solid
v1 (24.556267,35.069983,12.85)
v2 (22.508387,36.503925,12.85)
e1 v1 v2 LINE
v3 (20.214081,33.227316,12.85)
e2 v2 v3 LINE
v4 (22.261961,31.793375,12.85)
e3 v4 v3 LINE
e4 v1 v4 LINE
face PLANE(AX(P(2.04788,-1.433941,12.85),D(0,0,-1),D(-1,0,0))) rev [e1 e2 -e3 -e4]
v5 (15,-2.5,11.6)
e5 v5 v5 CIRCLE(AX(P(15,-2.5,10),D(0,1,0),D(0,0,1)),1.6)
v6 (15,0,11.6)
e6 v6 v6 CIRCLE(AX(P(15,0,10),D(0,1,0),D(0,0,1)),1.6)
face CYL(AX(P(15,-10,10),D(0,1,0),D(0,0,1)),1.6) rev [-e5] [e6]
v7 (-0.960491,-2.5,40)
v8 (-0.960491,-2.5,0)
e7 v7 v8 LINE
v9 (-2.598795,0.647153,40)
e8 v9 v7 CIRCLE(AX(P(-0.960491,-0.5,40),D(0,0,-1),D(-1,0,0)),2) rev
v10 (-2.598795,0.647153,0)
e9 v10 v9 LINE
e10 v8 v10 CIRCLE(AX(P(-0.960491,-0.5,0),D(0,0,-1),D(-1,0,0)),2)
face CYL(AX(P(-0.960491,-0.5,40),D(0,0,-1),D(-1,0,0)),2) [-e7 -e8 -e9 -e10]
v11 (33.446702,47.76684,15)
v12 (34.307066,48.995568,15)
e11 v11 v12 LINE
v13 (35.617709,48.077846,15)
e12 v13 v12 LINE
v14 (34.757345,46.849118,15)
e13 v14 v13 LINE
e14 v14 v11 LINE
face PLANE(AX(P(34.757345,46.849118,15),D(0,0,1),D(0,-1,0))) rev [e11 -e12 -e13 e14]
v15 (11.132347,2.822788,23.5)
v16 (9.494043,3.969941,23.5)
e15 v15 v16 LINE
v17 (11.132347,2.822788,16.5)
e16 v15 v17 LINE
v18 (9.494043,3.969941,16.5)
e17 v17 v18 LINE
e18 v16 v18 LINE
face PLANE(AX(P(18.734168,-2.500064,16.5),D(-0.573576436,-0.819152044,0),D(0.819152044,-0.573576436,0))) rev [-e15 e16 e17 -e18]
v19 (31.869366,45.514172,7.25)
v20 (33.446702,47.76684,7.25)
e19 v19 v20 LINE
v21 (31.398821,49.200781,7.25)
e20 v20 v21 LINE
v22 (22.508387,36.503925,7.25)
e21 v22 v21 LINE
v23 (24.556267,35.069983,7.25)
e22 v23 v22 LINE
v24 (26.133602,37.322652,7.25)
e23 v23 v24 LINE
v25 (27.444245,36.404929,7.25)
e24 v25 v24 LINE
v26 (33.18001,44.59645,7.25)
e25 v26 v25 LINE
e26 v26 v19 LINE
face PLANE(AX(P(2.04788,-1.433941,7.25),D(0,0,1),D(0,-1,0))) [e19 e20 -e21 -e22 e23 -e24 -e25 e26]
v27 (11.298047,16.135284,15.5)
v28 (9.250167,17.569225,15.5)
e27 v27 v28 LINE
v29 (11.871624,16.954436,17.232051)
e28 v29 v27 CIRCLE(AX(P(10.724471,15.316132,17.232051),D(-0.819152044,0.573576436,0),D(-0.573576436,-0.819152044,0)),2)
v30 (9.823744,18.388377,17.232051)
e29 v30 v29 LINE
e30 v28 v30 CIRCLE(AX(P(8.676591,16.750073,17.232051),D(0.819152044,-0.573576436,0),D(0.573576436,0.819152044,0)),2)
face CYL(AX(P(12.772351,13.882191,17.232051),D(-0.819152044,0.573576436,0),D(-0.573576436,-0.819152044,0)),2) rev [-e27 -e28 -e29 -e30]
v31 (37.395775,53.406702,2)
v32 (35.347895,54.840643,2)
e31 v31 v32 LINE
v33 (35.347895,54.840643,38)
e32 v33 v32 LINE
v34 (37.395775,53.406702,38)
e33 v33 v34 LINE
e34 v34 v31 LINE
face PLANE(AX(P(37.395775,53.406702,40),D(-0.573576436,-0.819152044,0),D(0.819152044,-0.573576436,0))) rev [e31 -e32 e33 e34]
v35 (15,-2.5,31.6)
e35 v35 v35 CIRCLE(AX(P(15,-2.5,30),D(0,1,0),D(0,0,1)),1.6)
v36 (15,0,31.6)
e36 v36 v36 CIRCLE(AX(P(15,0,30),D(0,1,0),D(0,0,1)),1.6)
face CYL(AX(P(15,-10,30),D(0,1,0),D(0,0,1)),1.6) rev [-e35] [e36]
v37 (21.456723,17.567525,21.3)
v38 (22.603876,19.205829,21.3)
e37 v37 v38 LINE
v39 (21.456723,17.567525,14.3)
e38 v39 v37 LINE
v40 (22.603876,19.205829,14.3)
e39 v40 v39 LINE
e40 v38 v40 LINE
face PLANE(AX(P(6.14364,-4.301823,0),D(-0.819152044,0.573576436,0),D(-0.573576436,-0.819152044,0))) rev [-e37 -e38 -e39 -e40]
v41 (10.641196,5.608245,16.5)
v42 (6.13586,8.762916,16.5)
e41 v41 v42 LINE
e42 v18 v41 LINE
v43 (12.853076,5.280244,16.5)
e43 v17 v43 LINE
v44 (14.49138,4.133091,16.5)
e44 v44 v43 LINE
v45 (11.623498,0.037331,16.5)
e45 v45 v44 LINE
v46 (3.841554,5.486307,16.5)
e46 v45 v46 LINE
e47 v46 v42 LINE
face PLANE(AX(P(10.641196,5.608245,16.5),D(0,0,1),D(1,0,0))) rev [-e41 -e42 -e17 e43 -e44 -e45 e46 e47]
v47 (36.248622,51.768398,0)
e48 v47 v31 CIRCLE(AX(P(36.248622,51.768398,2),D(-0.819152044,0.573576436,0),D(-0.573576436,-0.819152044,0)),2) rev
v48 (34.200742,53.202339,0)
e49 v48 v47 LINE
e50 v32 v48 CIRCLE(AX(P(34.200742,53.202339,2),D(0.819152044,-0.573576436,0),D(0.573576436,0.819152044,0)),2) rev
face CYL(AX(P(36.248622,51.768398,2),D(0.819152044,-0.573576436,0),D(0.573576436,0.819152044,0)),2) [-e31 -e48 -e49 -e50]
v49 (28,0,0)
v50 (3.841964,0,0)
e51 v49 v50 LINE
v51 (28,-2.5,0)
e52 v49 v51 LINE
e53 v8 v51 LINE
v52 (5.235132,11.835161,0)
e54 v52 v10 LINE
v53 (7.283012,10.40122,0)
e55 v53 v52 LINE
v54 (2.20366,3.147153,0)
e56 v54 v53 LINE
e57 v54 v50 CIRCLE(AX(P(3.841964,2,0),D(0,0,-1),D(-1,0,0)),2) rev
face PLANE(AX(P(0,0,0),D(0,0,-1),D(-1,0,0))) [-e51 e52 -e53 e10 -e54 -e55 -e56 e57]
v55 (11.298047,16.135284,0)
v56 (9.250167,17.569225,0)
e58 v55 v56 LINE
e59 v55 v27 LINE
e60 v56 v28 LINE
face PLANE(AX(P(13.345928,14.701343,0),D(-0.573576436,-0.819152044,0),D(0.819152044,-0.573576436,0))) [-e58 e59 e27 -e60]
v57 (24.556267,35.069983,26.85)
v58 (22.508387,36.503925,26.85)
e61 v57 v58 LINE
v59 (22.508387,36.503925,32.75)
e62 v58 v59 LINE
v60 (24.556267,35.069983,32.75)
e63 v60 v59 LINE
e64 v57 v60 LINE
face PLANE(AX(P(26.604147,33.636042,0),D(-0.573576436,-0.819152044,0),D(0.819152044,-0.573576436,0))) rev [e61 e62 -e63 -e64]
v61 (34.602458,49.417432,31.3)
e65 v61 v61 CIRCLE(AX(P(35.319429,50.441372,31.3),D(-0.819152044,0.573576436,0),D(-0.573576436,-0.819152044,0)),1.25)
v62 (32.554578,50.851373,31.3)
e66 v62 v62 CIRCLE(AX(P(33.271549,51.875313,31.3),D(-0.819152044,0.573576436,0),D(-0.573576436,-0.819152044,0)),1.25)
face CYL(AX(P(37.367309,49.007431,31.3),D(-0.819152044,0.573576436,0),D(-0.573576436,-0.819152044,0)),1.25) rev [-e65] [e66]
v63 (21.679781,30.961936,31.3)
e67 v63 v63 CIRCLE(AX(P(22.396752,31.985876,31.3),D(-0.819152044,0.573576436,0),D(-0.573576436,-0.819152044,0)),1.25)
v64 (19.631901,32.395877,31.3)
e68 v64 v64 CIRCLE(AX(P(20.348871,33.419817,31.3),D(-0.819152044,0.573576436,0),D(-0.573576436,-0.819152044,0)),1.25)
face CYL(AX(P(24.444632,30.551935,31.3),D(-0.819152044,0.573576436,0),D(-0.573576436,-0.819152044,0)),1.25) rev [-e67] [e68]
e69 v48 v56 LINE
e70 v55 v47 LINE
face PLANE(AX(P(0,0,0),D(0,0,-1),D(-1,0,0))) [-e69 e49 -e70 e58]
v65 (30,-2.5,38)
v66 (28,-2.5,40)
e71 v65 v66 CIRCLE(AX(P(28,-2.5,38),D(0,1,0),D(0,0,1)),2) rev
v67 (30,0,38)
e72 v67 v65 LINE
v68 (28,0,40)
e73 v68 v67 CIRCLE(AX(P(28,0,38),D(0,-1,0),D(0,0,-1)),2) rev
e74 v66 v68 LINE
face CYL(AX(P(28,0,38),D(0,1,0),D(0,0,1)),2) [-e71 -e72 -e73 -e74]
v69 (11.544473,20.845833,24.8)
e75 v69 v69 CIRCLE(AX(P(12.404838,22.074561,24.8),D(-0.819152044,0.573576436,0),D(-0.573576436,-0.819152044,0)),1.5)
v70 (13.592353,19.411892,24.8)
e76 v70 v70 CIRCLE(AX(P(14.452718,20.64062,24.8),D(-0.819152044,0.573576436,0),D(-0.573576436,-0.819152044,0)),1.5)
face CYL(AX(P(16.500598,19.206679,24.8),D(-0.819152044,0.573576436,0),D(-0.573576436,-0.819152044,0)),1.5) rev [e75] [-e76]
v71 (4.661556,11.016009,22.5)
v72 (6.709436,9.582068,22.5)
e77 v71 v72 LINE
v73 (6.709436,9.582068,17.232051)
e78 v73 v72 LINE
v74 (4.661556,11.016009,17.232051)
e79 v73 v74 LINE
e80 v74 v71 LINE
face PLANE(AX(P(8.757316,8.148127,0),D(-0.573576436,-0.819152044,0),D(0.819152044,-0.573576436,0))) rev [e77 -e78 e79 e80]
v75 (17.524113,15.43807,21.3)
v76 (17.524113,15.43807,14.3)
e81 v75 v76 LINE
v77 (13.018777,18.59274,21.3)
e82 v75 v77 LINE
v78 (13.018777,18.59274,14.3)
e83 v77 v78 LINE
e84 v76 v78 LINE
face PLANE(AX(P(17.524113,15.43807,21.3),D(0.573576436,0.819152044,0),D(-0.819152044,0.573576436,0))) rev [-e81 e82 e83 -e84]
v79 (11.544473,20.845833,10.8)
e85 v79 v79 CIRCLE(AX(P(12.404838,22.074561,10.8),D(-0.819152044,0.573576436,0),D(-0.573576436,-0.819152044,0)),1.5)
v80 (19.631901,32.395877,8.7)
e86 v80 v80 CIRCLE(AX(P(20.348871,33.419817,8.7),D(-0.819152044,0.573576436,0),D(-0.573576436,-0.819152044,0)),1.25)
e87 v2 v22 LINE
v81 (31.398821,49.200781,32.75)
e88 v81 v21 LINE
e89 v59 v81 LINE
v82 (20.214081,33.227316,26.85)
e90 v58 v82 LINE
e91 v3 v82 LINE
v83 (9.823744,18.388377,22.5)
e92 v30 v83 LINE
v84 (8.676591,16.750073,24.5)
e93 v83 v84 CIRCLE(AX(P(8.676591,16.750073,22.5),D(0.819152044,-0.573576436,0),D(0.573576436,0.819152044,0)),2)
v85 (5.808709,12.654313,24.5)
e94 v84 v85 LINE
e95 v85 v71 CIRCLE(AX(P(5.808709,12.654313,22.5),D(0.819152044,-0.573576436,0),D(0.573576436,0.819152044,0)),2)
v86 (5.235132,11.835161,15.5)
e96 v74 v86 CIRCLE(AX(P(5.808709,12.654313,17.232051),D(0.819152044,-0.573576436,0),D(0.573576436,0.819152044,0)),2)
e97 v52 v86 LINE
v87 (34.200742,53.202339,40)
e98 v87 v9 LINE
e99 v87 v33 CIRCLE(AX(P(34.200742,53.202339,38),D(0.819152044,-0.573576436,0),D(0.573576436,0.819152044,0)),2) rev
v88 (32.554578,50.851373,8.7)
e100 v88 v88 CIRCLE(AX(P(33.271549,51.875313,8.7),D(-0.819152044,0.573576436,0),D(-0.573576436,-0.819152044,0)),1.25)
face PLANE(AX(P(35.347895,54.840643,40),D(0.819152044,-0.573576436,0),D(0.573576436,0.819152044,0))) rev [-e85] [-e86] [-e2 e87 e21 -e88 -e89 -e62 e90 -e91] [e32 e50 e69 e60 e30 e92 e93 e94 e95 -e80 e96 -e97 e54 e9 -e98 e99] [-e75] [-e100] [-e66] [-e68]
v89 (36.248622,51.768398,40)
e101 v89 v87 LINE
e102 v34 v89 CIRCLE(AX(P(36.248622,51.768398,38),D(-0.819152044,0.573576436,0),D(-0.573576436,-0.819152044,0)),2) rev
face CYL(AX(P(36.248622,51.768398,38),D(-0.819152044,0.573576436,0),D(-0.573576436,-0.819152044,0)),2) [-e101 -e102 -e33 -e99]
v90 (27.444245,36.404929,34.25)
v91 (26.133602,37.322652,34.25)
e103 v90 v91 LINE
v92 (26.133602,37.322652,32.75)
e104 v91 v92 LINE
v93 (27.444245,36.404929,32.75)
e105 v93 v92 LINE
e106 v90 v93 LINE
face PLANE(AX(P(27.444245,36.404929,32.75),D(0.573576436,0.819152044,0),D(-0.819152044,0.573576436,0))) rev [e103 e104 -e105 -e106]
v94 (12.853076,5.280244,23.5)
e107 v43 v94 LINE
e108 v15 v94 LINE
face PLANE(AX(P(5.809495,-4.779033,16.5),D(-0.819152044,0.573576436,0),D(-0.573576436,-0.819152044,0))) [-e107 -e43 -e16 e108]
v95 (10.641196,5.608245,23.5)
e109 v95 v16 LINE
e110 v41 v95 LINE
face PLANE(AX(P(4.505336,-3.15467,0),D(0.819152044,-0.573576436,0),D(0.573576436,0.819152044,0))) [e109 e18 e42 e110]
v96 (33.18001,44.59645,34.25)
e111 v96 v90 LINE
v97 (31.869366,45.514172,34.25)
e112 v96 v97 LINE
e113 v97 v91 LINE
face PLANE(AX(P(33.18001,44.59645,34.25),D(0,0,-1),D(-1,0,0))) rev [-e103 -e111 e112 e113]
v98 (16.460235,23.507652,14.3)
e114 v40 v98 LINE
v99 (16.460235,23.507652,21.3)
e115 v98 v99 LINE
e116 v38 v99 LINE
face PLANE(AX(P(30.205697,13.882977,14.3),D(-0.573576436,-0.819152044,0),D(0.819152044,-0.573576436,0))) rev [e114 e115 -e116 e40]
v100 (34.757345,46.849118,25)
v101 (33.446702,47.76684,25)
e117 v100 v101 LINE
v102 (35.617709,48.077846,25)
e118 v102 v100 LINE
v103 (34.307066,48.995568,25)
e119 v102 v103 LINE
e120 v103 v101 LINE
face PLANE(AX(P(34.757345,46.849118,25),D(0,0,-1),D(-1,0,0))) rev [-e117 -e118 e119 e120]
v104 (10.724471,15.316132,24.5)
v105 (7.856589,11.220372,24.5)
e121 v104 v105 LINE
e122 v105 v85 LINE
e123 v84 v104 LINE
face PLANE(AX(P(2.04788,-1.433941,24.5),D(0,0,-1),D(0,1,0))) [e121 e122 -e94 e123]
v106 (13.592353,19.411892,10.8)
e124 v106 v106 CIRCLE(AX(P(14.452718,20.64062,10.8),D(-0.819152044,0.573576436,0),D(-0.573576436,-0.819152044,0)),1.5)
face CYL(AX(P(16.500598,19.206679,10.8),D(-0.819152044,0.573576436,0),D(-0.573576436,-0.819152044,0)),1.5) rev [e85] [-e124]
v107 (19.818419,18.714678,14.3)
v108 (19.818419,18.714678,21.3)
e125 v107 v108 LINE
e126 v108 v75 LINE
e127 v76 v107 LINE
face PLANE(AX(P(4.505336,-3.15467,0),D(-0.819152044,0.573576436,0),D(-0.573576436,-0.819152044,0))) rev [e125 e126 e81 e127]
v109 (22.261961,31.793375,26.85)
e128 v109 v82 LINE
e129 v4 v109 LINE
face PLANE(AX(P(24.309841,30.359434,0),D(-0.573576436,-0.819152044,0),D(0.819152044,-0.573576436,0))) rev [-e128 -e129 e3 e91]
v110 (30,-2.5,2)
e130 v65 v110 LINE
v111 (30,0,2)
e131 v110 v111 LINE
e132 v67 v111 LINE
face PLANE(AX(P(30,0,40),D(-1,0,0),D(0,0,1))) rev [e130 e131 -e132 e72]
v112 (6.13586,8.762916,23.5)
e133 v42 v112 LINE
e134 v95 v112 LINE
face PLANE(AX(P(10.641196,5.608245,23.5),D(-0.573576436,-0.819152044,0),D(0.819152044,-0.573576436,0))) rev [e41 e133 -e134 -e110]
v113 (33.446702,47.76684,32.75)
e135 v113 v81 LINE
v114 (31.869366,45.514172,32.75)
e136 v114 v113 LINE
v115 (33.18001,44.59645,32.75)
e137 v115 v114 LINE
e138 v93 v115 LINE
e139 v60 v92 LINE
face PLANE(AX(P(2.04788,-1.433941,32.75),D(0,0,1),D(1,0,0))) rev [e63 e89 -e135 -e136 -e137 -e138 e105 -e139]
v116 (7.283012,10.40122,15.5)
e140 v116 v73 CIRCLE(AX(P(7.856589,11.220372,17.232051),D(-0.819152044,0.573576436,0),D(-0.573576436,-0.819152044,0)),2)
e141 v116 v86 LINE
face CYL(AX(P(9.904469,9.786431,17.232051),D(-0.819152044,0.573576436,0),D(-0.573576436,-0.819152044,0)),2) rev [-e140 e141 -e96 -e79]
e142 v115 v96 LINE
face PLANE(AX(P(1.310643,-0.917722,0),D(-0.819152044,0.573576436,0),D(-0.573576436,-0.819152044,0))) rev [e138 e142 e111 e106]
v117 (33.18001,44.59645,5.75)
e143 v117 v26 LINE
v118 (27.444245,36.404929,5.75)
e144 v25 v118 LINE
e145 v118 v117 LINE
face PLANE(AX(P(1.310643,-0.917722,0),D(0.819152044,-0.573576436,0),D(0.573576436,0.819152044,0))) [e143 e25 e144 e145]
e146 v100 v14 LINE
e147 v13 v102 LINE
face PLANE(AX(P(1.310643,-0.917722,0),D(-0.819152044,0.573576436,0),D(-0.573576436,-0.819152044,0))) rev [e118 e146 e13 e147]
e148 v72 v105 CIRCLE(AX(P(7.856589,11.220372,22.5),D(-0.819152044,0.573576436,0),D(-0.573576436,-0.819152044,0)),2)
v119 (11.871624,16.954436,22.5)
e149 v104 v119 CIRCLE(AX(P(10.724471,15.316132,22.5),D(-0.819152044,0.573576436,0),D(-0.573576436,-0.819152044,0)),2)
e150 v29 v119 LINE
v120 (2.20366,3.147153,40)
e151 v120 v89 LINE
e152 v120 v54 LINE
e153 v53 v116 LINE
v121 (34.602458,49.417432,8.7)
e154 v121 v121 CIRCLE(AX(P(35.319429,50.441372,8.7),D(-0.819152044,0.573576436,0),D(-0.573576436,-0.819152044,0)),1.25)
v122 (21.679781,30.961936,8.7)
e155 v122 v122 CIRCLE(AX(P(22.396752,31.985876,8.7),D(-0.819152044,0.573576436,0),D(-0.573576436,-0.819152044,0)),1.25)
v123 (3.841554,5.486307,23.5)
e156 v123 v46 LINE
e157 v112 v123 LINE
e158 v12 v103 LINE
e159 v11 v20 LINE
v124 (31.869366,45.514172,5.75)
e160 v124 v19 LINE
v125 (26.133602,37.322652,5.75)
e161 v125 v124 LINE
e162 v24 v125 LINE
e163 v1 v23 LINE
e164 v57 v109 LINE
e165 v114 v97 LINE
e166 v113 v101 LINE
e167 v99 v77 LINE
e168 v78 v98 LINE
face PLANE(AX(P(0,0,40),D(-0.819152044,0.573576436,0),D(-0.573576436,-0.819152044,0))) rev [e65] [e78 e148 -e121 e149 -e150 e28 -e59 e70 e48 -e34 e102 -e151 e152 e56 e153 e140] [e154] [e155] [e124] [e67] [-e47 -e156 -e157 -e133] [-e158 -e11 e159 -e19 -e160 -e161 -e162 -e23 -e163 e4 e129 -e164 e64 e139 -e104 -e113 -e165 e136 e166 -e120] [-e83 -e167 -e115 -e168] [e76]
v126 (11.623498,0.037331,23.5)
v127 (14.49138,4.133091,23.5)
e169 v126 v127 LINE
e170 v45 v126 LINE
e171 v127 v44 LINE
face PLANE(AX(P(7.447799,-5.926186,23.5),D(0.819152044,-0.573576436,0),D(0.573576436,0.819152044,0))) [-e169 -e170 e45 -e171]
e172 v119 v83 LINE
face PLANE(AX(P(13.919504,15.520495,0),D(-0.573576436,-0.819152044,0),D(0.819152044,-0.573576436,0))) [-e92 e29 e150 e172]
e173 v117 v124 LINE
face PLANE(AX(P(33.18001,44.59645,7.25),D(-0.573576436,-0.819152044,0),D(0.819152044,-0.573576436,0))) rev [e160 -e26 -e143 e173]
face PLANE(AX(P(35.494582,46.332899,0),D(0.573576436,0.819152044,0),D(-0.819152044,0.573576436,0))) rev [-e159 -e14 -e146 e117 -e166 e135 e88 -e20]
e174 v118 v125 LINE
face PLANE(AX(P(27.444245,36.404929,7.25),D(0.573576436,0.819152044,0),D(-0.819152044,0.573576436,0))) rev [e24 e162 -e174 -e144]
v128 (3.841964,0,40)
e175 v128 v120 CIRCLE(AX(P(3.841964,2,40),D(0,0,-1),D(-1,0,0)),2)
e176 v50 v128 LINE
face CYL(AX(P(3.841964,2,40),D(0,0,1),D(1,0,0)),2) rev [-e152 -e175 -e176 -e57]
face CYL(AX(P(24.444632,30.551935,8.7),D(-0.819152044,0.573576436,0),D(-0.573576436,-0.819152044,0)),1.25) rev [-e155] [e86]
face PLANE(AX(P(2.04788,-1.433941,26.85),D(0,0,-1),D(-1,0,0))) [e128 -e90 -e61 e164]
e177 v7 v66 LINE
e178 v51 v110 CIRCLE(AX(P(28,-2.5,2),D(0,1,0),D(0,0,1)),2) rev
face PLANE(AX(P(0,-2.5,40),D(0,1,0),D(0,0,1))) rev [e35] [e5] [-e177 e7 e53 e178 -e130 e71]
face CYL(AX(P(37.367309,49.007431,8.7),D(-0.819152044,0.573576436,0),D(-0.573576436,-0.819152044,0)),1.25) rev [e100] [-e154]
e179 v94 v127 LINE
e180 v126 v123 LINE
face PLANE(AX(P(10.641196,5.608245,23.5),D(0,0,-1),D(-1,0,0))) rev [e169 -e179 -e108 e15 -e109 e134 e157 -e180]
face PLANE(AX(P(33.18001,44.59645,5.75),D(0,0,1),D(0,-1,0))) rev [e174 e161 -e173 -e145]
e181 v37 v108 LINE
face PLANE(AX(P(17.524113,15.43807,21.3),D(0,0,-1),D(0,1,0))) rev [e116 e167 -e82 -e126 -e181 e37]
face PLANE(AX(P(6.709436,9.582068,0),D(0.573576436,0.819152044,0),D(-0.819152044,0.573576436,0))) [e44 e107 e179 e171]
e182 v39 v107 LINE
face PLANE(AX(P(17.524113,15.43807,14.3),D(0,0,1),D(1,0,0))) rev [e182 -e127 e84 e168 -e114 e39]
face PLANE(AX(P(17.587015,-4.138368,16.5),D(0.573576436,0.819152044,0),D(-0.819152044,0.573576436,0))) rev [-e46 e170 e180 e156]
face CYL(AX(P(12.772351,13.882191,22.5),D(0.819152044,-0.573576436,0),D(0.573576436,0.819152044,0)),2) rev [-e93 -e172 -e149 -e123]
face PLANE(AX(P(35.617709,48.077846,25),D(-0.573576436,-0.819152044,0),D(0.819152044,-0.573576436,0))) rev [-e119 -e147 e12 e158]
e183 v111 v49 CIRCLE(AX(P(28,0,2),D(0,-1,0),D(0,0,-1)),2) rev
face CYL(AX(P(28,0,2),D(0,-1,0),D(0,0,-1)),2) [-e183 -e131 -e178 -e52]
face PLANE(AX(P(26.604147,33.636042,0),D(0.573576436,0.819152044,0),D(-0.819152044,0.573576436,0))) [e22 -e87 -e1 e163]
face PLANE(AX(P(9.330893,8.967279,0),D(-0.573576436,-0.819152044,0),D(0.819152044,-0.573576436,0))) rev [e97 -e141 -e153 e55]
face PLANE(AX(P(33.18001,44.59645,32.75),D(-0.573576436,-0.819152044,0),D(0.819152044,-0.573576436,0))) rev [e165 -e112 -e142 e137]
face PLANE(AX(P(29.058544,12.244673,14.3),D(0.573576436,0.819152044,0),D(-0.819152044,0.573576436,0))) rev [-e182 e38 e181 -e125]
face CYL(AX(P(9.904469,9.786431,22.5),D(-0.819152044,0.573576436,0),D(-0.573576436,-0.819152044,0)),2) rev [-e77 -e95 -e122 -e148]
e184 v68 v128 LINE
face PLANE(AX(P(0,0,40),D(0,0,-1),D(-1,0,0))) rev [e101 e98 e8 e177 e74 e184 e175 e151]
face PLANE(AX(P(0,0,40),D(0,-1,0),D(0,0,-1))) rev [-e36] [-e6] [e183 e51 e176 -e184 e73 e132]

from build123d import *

# Parameters (mm, degrees)
BOSS_EXTRUDE1_DEPTH      = 40
SKETCH2_R                = 1.25
SKETCH2_R_2              = 1.5
SKETCH2_W                = 9
SKETCH2_H                = 9
SKETCH2_W_2              = 15.5
SKETCH2_H_2              = 7
CUT_EXTRUDE2_DEPTH       = 5
SKETCH4_W                = 7
SKETCH4_H                = 4
SKETCH4_H_2              = 2
BOSS_EXTRUDE2_DEPTH      = 5.5
SKETCH6_W                = 7
SKETCH6_H                = 2
BOSS_EXTRUDE3_DEPTH      = 7.5
BOSS_EXTRUDE4_DEPTH      = 3
BOSS_EXTRUDE4_DEPTH_BACK = 2
SKETCH10_W               = 1.5
SKETCH10_H               = 10
SKETCH10_W_2             = 10
SKETCH10_H_2             = 1.5
BOSS_EXTRUDE6_DEPTH      = 1.6
SKETCH5_R                = 1.6
CUT_EXTRUDE3_DEPTH       = 10
FILLET1_R                = 2


with BuildPart() as part:
    # Sketch1 → Boss-Extrude1 (new body)
    with BuildSketch(Plane.XY):
        Polygon((0, 0), (37.395775338, 53.406702009), (35.347895227, 54.8406431), (-4.802455317, -2.5), (0, -2.5), (30, -2.5), (30, 0), align=None)
    extrude(amount=BOSS_EXTRUDE1_DEPTH)

    # Sketch2 → Cut-Extrude2 (cut)
    with BuildSketch(Plane(origin=(-2.047880111, 1.433941091, 0), x_dir=(0, 0, 1), z_dir=(-0.8191520442889935, 0.5735764363510438, 0))):
        Polygon((26.85, 42.812544683), (32.75, 42.812544683), (32.75, 58.312544683), (7.25, 58.312544683), (7.25, 42.812544683), (12.85, 42.812544683), (12.85, 38.812544683), (26.85, 38.812544683), align=None)
        with Locations(Location((8.7, 39.047544683, 0), (0, 0, 270))):
            Circle(SKETCH2_R)
        with Locations(Location((31.3, 39.047544683, 0), (0, 0, 270))):
            Circle(SKETCH2_R)
        with Locations(Location((8.7, 61.577544683, 0), (0, 0, 270))):
            Circle(SKETCH2_R)
        with Locations(Location((31.3, 61.577544683, 0), (0, 0, 270))):
            Circle(SKETCH2_R)
        with Locations(Location((10.8, 25.197544683, 0), (0, 0, 270))):
            Circle(SKETCH2_R_2)
        with Locations(Location((24.8, 25.197544683, 0), (0, 0, 270))):
            Circle(SKETCH2_R_2)
        with Locations((20, 16.197544683)):
            Rectangle(SKETCH2_W, SKETCH2_H)
        with Locations((7.75, 16.197544683)):
            Rectangle(SKETCH2_W_2, SKETCH2_H_2)
    extrude(amount=-CUT_EXTRUDE2_DEPTH, mode=Mode.SUBTRACT)

    # Sketch4 → Boss-Extrude2 (add)
    with BuildSketch(Plane(origin=(0, 0, 0), x_dir=(0, 0, -1), z_dir=(0.8191520442889932, -0.5735764363510439, 0))):
        with Locations((-17.8, 24.697544683)):
            Rectangle(SKETCH4_W, SKETCH4_H)
        with Locations((-20, 9.697544683)):
            Rectangle(SKETCH4_W, SKETCH4_H_2)
    extrude(amount=BOSS_EXTRUDE2_DEPTH)

    # Sketch6 → Boss-Extrude3 (add)
    with BuildSketch(Plane(origin=(0, 0, 0), x_dir=(0, 0, -1), z_dir=(0.8191520442889932, -0.5735764363510439, 0))):
        with Locations((-17.8, 27.697544683)):
            Rectangle(SKETCH6_W, SKETCH6_H)
        with Locations((-20, 7.697544683)):
            Rectangle(SKETCH6_W, SKETCH6_H)
    extrude(amount=BOSS_EXTRUDE3_DEPTH)

    # Sketch8 → Boss-Extrude4 (add, two sides: drawn at the far end of the back side and taken through both)
    with BuildSketch(Plane(origin=(4.988706684, 7.124611507, 21.197544683), x_dir=(0.671010071662837, -0.4698463103929531, -0.5735764363510439), z_dir=(0.5735764363510439, 0.8191520442889935, 0)).offset(-BOSS_EXTRUDE4_DEPTH_BACK)):
        Polygon((8.838041271, -0.453819943), (4.823006216, -6.187884253), (6.461310305, -7.335037125), (10.476345359, -1.600972815), align=None)
    extrude(amount=BOSS_EXTRUDE4_DEPTH + BOSS_EXTRUDE4_DEPTH_BACK)

    # Sketch10 → Boss-Extrude6 (add)
    with BuildSketch(Plane(origin=(0, 0, 0), x_dir=(0, 0, -1), z_dir=(0.8191520442889934, -0.5735764363510439, 0))):
        with Locations((-33.5, 50.562544683)):
            Rectangle(SKETCH10_W, SKETCH10_H)
        with Locations((-6.5, 50.562544683)):
            Rectangle(SKETCH10_W, SKETCH10_H)
        with Locations((-20, 59.062544683)):
            Rectangle(SKETCH10_W_2, SKETCH10_H_2)
    extrude(amount=BOSS_EXTRUDE6_DEPTH)

    # Sketch5 → Cut-Extrude3 (cut)
    with BuildSketch(Plane(origin=(0, 0, 0), x_dir=(1, 0, 0), z_dir=(0, 1, 0))):
        with Locations(Location((15, -10, 0), (0, 0, 270))):
            Circle(SKETCH5_R)
        with Locations(Location((15, -30, 0), (0, 0, 270))):
            Circle(SKETCH5_R)
    extrude(amount=-CUT_EXTRUDE3_DEPTH, mode=Mode.SUBTRACT)

    # Fillet1
    # the kernel refuses this fillet: 2 mm, written as the material it adds along each edge
    with BuildSketch(Plane(origin=(0, 0, 0), x_dir=(0.5735764363510439, 0.8191520442889934, 0), z_dir=(0, 0, 1))) as fillet1_piece_1:
        with BuildLine():
            CenterArc((FILLET1_R * 1.92098212697, -FILLET1_R), FILLET1_R, 90, 125)
            Line((FILLET1_R * 1.10183008268, -FILLET1_R * 1.57357643635), (0, 0))
            Line((0, 0), (FILLET1_R * 1.92098212697, 0))
        make_face()
    extrude(amount=40)
    with BuildSketch(Plane(origin=(9.82374381, 18.388377129, 24.5), x_dir=(-0.5735764363510438, -0.8191520442889935, 0), z_dir=(0.8191520442889935, -0.5735764363510438, 0)), Plane(origin=(4.661555882, 11.016008731, 24.5), x_dir=(0, 0, -1), z_dir=(0.8191520442889935, -0.5735764363510438, 0))) as fillet1_piece_2:
        with BuildLine():
            CenterArc((FILLET1_R, FILLET1_R), FILLET1_R, 180, 90)
            Line((0, FILLET1_R), (0, 0))
            Line((0, 0), (FILLET1_R, 0))
        make_face()
    extrude(amount=2.5)
    with BuildSketch(Plane(origin=(4.661555882, 11.016008731, 15.5), x_dir=(0.5735764363510438, 0.8191520442889935, 7.105427357600794e-14), z_dir=(0.8191520442889935, -0.5735764363510438, 0))) as fillet1_piece_3:
        with BuildLine():
            CenterArc((2, 1.732050808), FILLET1_R, 180, 60)
            Line((0, 1.732050808), (0, 0))
            Line((0, 0), (1, 0))
        make_face()
    extrude(amount=2.5)
    with BuildSketch(Plane(origin=(9.82374381, 18.388377129, 15.5), x_dir=(0, 0, 1), z_dir=(0.8191520442889935, -0.5735764363510438, 0))) as fillet1_piece_4:
        with BuildLine():
            CenterArc((1.732050808, 2), FILLET1_R, 210, 60)
            Line((0, 1), (0, 0))
            Line((0, 0), (1.732050808, 0))
        make_face()
    extrude(amount=2.5)
    # the kernel refuses this fillet: 2 mm, written as the material it takes off along each edge
    with BuildSketch(Plane(origin=(41.491535559, 50.538819828, 40), x_dir=(0, 0, -1), z_dir=(-0.8191520442889935, 0.5735764363510437, 0)), Plane(origin=(30, -7.5, 0), x_dir=(-1, 0, 0), z_dir=(0, 1, 0)), Plane(origin=(41.491535559, 50.538819828, 0), x_dir=(-0.5735764363510438, -0.8191520442889935, 0), z_dir=(-0.8191520442889935, 0.5735764363510437, 0))) as fillet1_2_piece_1:
        with BuildLine():
            CenterArc((FILLET1_R, FILLET1_R), FILLET1_R, 180, 90)
            Line((0, FILLET1_R), (0, 0))
            Line((0, 0), (FILLET1_R, 0))
        make_face()
    extrude(amount=12.5, mode=Mode.SUBTRACT)
    with BuildSketch(Plane(origin=(-4.802455317, -2.5, -9.604910635), x_dir=(1, 0, 0), z_dir=(0, 0, 1))) as fillet1_2_piece_2:
        with BuildLine():
            CenterArc((FILLET1_R * 1.92098212697, FILLET1_R), FILLET1_R, 145, 125)
            Line((FILLET1_R * 1.10183008268, FILLET1_R * 1.57357643635), (0, 0))
            Line((0, 0), (FILLET1_R * 1.92098212697, 0))
        make_face()
    extrude(amount=59.20982127, mode=Mode.SUBTRACT)
    with BuildSketch(Plane(origin=(30, -7.5, 40), x_dir=(-1, 0, 0), z_dir=(0, 1, 0))) as fillet1_2_piece_3:
        with BuildLine():
            CenterArc((FILLET1_R, -FILLET1_R), FILLET1_R, 90, 90)
            Line((0, -FILLET1_R), (0, 0))
            Line((0, 0), (FILLET1_R, 0))
        make_face()
    extrude(amount=12.5, mode=Mode.SUBTRACT)


solid = part.part
